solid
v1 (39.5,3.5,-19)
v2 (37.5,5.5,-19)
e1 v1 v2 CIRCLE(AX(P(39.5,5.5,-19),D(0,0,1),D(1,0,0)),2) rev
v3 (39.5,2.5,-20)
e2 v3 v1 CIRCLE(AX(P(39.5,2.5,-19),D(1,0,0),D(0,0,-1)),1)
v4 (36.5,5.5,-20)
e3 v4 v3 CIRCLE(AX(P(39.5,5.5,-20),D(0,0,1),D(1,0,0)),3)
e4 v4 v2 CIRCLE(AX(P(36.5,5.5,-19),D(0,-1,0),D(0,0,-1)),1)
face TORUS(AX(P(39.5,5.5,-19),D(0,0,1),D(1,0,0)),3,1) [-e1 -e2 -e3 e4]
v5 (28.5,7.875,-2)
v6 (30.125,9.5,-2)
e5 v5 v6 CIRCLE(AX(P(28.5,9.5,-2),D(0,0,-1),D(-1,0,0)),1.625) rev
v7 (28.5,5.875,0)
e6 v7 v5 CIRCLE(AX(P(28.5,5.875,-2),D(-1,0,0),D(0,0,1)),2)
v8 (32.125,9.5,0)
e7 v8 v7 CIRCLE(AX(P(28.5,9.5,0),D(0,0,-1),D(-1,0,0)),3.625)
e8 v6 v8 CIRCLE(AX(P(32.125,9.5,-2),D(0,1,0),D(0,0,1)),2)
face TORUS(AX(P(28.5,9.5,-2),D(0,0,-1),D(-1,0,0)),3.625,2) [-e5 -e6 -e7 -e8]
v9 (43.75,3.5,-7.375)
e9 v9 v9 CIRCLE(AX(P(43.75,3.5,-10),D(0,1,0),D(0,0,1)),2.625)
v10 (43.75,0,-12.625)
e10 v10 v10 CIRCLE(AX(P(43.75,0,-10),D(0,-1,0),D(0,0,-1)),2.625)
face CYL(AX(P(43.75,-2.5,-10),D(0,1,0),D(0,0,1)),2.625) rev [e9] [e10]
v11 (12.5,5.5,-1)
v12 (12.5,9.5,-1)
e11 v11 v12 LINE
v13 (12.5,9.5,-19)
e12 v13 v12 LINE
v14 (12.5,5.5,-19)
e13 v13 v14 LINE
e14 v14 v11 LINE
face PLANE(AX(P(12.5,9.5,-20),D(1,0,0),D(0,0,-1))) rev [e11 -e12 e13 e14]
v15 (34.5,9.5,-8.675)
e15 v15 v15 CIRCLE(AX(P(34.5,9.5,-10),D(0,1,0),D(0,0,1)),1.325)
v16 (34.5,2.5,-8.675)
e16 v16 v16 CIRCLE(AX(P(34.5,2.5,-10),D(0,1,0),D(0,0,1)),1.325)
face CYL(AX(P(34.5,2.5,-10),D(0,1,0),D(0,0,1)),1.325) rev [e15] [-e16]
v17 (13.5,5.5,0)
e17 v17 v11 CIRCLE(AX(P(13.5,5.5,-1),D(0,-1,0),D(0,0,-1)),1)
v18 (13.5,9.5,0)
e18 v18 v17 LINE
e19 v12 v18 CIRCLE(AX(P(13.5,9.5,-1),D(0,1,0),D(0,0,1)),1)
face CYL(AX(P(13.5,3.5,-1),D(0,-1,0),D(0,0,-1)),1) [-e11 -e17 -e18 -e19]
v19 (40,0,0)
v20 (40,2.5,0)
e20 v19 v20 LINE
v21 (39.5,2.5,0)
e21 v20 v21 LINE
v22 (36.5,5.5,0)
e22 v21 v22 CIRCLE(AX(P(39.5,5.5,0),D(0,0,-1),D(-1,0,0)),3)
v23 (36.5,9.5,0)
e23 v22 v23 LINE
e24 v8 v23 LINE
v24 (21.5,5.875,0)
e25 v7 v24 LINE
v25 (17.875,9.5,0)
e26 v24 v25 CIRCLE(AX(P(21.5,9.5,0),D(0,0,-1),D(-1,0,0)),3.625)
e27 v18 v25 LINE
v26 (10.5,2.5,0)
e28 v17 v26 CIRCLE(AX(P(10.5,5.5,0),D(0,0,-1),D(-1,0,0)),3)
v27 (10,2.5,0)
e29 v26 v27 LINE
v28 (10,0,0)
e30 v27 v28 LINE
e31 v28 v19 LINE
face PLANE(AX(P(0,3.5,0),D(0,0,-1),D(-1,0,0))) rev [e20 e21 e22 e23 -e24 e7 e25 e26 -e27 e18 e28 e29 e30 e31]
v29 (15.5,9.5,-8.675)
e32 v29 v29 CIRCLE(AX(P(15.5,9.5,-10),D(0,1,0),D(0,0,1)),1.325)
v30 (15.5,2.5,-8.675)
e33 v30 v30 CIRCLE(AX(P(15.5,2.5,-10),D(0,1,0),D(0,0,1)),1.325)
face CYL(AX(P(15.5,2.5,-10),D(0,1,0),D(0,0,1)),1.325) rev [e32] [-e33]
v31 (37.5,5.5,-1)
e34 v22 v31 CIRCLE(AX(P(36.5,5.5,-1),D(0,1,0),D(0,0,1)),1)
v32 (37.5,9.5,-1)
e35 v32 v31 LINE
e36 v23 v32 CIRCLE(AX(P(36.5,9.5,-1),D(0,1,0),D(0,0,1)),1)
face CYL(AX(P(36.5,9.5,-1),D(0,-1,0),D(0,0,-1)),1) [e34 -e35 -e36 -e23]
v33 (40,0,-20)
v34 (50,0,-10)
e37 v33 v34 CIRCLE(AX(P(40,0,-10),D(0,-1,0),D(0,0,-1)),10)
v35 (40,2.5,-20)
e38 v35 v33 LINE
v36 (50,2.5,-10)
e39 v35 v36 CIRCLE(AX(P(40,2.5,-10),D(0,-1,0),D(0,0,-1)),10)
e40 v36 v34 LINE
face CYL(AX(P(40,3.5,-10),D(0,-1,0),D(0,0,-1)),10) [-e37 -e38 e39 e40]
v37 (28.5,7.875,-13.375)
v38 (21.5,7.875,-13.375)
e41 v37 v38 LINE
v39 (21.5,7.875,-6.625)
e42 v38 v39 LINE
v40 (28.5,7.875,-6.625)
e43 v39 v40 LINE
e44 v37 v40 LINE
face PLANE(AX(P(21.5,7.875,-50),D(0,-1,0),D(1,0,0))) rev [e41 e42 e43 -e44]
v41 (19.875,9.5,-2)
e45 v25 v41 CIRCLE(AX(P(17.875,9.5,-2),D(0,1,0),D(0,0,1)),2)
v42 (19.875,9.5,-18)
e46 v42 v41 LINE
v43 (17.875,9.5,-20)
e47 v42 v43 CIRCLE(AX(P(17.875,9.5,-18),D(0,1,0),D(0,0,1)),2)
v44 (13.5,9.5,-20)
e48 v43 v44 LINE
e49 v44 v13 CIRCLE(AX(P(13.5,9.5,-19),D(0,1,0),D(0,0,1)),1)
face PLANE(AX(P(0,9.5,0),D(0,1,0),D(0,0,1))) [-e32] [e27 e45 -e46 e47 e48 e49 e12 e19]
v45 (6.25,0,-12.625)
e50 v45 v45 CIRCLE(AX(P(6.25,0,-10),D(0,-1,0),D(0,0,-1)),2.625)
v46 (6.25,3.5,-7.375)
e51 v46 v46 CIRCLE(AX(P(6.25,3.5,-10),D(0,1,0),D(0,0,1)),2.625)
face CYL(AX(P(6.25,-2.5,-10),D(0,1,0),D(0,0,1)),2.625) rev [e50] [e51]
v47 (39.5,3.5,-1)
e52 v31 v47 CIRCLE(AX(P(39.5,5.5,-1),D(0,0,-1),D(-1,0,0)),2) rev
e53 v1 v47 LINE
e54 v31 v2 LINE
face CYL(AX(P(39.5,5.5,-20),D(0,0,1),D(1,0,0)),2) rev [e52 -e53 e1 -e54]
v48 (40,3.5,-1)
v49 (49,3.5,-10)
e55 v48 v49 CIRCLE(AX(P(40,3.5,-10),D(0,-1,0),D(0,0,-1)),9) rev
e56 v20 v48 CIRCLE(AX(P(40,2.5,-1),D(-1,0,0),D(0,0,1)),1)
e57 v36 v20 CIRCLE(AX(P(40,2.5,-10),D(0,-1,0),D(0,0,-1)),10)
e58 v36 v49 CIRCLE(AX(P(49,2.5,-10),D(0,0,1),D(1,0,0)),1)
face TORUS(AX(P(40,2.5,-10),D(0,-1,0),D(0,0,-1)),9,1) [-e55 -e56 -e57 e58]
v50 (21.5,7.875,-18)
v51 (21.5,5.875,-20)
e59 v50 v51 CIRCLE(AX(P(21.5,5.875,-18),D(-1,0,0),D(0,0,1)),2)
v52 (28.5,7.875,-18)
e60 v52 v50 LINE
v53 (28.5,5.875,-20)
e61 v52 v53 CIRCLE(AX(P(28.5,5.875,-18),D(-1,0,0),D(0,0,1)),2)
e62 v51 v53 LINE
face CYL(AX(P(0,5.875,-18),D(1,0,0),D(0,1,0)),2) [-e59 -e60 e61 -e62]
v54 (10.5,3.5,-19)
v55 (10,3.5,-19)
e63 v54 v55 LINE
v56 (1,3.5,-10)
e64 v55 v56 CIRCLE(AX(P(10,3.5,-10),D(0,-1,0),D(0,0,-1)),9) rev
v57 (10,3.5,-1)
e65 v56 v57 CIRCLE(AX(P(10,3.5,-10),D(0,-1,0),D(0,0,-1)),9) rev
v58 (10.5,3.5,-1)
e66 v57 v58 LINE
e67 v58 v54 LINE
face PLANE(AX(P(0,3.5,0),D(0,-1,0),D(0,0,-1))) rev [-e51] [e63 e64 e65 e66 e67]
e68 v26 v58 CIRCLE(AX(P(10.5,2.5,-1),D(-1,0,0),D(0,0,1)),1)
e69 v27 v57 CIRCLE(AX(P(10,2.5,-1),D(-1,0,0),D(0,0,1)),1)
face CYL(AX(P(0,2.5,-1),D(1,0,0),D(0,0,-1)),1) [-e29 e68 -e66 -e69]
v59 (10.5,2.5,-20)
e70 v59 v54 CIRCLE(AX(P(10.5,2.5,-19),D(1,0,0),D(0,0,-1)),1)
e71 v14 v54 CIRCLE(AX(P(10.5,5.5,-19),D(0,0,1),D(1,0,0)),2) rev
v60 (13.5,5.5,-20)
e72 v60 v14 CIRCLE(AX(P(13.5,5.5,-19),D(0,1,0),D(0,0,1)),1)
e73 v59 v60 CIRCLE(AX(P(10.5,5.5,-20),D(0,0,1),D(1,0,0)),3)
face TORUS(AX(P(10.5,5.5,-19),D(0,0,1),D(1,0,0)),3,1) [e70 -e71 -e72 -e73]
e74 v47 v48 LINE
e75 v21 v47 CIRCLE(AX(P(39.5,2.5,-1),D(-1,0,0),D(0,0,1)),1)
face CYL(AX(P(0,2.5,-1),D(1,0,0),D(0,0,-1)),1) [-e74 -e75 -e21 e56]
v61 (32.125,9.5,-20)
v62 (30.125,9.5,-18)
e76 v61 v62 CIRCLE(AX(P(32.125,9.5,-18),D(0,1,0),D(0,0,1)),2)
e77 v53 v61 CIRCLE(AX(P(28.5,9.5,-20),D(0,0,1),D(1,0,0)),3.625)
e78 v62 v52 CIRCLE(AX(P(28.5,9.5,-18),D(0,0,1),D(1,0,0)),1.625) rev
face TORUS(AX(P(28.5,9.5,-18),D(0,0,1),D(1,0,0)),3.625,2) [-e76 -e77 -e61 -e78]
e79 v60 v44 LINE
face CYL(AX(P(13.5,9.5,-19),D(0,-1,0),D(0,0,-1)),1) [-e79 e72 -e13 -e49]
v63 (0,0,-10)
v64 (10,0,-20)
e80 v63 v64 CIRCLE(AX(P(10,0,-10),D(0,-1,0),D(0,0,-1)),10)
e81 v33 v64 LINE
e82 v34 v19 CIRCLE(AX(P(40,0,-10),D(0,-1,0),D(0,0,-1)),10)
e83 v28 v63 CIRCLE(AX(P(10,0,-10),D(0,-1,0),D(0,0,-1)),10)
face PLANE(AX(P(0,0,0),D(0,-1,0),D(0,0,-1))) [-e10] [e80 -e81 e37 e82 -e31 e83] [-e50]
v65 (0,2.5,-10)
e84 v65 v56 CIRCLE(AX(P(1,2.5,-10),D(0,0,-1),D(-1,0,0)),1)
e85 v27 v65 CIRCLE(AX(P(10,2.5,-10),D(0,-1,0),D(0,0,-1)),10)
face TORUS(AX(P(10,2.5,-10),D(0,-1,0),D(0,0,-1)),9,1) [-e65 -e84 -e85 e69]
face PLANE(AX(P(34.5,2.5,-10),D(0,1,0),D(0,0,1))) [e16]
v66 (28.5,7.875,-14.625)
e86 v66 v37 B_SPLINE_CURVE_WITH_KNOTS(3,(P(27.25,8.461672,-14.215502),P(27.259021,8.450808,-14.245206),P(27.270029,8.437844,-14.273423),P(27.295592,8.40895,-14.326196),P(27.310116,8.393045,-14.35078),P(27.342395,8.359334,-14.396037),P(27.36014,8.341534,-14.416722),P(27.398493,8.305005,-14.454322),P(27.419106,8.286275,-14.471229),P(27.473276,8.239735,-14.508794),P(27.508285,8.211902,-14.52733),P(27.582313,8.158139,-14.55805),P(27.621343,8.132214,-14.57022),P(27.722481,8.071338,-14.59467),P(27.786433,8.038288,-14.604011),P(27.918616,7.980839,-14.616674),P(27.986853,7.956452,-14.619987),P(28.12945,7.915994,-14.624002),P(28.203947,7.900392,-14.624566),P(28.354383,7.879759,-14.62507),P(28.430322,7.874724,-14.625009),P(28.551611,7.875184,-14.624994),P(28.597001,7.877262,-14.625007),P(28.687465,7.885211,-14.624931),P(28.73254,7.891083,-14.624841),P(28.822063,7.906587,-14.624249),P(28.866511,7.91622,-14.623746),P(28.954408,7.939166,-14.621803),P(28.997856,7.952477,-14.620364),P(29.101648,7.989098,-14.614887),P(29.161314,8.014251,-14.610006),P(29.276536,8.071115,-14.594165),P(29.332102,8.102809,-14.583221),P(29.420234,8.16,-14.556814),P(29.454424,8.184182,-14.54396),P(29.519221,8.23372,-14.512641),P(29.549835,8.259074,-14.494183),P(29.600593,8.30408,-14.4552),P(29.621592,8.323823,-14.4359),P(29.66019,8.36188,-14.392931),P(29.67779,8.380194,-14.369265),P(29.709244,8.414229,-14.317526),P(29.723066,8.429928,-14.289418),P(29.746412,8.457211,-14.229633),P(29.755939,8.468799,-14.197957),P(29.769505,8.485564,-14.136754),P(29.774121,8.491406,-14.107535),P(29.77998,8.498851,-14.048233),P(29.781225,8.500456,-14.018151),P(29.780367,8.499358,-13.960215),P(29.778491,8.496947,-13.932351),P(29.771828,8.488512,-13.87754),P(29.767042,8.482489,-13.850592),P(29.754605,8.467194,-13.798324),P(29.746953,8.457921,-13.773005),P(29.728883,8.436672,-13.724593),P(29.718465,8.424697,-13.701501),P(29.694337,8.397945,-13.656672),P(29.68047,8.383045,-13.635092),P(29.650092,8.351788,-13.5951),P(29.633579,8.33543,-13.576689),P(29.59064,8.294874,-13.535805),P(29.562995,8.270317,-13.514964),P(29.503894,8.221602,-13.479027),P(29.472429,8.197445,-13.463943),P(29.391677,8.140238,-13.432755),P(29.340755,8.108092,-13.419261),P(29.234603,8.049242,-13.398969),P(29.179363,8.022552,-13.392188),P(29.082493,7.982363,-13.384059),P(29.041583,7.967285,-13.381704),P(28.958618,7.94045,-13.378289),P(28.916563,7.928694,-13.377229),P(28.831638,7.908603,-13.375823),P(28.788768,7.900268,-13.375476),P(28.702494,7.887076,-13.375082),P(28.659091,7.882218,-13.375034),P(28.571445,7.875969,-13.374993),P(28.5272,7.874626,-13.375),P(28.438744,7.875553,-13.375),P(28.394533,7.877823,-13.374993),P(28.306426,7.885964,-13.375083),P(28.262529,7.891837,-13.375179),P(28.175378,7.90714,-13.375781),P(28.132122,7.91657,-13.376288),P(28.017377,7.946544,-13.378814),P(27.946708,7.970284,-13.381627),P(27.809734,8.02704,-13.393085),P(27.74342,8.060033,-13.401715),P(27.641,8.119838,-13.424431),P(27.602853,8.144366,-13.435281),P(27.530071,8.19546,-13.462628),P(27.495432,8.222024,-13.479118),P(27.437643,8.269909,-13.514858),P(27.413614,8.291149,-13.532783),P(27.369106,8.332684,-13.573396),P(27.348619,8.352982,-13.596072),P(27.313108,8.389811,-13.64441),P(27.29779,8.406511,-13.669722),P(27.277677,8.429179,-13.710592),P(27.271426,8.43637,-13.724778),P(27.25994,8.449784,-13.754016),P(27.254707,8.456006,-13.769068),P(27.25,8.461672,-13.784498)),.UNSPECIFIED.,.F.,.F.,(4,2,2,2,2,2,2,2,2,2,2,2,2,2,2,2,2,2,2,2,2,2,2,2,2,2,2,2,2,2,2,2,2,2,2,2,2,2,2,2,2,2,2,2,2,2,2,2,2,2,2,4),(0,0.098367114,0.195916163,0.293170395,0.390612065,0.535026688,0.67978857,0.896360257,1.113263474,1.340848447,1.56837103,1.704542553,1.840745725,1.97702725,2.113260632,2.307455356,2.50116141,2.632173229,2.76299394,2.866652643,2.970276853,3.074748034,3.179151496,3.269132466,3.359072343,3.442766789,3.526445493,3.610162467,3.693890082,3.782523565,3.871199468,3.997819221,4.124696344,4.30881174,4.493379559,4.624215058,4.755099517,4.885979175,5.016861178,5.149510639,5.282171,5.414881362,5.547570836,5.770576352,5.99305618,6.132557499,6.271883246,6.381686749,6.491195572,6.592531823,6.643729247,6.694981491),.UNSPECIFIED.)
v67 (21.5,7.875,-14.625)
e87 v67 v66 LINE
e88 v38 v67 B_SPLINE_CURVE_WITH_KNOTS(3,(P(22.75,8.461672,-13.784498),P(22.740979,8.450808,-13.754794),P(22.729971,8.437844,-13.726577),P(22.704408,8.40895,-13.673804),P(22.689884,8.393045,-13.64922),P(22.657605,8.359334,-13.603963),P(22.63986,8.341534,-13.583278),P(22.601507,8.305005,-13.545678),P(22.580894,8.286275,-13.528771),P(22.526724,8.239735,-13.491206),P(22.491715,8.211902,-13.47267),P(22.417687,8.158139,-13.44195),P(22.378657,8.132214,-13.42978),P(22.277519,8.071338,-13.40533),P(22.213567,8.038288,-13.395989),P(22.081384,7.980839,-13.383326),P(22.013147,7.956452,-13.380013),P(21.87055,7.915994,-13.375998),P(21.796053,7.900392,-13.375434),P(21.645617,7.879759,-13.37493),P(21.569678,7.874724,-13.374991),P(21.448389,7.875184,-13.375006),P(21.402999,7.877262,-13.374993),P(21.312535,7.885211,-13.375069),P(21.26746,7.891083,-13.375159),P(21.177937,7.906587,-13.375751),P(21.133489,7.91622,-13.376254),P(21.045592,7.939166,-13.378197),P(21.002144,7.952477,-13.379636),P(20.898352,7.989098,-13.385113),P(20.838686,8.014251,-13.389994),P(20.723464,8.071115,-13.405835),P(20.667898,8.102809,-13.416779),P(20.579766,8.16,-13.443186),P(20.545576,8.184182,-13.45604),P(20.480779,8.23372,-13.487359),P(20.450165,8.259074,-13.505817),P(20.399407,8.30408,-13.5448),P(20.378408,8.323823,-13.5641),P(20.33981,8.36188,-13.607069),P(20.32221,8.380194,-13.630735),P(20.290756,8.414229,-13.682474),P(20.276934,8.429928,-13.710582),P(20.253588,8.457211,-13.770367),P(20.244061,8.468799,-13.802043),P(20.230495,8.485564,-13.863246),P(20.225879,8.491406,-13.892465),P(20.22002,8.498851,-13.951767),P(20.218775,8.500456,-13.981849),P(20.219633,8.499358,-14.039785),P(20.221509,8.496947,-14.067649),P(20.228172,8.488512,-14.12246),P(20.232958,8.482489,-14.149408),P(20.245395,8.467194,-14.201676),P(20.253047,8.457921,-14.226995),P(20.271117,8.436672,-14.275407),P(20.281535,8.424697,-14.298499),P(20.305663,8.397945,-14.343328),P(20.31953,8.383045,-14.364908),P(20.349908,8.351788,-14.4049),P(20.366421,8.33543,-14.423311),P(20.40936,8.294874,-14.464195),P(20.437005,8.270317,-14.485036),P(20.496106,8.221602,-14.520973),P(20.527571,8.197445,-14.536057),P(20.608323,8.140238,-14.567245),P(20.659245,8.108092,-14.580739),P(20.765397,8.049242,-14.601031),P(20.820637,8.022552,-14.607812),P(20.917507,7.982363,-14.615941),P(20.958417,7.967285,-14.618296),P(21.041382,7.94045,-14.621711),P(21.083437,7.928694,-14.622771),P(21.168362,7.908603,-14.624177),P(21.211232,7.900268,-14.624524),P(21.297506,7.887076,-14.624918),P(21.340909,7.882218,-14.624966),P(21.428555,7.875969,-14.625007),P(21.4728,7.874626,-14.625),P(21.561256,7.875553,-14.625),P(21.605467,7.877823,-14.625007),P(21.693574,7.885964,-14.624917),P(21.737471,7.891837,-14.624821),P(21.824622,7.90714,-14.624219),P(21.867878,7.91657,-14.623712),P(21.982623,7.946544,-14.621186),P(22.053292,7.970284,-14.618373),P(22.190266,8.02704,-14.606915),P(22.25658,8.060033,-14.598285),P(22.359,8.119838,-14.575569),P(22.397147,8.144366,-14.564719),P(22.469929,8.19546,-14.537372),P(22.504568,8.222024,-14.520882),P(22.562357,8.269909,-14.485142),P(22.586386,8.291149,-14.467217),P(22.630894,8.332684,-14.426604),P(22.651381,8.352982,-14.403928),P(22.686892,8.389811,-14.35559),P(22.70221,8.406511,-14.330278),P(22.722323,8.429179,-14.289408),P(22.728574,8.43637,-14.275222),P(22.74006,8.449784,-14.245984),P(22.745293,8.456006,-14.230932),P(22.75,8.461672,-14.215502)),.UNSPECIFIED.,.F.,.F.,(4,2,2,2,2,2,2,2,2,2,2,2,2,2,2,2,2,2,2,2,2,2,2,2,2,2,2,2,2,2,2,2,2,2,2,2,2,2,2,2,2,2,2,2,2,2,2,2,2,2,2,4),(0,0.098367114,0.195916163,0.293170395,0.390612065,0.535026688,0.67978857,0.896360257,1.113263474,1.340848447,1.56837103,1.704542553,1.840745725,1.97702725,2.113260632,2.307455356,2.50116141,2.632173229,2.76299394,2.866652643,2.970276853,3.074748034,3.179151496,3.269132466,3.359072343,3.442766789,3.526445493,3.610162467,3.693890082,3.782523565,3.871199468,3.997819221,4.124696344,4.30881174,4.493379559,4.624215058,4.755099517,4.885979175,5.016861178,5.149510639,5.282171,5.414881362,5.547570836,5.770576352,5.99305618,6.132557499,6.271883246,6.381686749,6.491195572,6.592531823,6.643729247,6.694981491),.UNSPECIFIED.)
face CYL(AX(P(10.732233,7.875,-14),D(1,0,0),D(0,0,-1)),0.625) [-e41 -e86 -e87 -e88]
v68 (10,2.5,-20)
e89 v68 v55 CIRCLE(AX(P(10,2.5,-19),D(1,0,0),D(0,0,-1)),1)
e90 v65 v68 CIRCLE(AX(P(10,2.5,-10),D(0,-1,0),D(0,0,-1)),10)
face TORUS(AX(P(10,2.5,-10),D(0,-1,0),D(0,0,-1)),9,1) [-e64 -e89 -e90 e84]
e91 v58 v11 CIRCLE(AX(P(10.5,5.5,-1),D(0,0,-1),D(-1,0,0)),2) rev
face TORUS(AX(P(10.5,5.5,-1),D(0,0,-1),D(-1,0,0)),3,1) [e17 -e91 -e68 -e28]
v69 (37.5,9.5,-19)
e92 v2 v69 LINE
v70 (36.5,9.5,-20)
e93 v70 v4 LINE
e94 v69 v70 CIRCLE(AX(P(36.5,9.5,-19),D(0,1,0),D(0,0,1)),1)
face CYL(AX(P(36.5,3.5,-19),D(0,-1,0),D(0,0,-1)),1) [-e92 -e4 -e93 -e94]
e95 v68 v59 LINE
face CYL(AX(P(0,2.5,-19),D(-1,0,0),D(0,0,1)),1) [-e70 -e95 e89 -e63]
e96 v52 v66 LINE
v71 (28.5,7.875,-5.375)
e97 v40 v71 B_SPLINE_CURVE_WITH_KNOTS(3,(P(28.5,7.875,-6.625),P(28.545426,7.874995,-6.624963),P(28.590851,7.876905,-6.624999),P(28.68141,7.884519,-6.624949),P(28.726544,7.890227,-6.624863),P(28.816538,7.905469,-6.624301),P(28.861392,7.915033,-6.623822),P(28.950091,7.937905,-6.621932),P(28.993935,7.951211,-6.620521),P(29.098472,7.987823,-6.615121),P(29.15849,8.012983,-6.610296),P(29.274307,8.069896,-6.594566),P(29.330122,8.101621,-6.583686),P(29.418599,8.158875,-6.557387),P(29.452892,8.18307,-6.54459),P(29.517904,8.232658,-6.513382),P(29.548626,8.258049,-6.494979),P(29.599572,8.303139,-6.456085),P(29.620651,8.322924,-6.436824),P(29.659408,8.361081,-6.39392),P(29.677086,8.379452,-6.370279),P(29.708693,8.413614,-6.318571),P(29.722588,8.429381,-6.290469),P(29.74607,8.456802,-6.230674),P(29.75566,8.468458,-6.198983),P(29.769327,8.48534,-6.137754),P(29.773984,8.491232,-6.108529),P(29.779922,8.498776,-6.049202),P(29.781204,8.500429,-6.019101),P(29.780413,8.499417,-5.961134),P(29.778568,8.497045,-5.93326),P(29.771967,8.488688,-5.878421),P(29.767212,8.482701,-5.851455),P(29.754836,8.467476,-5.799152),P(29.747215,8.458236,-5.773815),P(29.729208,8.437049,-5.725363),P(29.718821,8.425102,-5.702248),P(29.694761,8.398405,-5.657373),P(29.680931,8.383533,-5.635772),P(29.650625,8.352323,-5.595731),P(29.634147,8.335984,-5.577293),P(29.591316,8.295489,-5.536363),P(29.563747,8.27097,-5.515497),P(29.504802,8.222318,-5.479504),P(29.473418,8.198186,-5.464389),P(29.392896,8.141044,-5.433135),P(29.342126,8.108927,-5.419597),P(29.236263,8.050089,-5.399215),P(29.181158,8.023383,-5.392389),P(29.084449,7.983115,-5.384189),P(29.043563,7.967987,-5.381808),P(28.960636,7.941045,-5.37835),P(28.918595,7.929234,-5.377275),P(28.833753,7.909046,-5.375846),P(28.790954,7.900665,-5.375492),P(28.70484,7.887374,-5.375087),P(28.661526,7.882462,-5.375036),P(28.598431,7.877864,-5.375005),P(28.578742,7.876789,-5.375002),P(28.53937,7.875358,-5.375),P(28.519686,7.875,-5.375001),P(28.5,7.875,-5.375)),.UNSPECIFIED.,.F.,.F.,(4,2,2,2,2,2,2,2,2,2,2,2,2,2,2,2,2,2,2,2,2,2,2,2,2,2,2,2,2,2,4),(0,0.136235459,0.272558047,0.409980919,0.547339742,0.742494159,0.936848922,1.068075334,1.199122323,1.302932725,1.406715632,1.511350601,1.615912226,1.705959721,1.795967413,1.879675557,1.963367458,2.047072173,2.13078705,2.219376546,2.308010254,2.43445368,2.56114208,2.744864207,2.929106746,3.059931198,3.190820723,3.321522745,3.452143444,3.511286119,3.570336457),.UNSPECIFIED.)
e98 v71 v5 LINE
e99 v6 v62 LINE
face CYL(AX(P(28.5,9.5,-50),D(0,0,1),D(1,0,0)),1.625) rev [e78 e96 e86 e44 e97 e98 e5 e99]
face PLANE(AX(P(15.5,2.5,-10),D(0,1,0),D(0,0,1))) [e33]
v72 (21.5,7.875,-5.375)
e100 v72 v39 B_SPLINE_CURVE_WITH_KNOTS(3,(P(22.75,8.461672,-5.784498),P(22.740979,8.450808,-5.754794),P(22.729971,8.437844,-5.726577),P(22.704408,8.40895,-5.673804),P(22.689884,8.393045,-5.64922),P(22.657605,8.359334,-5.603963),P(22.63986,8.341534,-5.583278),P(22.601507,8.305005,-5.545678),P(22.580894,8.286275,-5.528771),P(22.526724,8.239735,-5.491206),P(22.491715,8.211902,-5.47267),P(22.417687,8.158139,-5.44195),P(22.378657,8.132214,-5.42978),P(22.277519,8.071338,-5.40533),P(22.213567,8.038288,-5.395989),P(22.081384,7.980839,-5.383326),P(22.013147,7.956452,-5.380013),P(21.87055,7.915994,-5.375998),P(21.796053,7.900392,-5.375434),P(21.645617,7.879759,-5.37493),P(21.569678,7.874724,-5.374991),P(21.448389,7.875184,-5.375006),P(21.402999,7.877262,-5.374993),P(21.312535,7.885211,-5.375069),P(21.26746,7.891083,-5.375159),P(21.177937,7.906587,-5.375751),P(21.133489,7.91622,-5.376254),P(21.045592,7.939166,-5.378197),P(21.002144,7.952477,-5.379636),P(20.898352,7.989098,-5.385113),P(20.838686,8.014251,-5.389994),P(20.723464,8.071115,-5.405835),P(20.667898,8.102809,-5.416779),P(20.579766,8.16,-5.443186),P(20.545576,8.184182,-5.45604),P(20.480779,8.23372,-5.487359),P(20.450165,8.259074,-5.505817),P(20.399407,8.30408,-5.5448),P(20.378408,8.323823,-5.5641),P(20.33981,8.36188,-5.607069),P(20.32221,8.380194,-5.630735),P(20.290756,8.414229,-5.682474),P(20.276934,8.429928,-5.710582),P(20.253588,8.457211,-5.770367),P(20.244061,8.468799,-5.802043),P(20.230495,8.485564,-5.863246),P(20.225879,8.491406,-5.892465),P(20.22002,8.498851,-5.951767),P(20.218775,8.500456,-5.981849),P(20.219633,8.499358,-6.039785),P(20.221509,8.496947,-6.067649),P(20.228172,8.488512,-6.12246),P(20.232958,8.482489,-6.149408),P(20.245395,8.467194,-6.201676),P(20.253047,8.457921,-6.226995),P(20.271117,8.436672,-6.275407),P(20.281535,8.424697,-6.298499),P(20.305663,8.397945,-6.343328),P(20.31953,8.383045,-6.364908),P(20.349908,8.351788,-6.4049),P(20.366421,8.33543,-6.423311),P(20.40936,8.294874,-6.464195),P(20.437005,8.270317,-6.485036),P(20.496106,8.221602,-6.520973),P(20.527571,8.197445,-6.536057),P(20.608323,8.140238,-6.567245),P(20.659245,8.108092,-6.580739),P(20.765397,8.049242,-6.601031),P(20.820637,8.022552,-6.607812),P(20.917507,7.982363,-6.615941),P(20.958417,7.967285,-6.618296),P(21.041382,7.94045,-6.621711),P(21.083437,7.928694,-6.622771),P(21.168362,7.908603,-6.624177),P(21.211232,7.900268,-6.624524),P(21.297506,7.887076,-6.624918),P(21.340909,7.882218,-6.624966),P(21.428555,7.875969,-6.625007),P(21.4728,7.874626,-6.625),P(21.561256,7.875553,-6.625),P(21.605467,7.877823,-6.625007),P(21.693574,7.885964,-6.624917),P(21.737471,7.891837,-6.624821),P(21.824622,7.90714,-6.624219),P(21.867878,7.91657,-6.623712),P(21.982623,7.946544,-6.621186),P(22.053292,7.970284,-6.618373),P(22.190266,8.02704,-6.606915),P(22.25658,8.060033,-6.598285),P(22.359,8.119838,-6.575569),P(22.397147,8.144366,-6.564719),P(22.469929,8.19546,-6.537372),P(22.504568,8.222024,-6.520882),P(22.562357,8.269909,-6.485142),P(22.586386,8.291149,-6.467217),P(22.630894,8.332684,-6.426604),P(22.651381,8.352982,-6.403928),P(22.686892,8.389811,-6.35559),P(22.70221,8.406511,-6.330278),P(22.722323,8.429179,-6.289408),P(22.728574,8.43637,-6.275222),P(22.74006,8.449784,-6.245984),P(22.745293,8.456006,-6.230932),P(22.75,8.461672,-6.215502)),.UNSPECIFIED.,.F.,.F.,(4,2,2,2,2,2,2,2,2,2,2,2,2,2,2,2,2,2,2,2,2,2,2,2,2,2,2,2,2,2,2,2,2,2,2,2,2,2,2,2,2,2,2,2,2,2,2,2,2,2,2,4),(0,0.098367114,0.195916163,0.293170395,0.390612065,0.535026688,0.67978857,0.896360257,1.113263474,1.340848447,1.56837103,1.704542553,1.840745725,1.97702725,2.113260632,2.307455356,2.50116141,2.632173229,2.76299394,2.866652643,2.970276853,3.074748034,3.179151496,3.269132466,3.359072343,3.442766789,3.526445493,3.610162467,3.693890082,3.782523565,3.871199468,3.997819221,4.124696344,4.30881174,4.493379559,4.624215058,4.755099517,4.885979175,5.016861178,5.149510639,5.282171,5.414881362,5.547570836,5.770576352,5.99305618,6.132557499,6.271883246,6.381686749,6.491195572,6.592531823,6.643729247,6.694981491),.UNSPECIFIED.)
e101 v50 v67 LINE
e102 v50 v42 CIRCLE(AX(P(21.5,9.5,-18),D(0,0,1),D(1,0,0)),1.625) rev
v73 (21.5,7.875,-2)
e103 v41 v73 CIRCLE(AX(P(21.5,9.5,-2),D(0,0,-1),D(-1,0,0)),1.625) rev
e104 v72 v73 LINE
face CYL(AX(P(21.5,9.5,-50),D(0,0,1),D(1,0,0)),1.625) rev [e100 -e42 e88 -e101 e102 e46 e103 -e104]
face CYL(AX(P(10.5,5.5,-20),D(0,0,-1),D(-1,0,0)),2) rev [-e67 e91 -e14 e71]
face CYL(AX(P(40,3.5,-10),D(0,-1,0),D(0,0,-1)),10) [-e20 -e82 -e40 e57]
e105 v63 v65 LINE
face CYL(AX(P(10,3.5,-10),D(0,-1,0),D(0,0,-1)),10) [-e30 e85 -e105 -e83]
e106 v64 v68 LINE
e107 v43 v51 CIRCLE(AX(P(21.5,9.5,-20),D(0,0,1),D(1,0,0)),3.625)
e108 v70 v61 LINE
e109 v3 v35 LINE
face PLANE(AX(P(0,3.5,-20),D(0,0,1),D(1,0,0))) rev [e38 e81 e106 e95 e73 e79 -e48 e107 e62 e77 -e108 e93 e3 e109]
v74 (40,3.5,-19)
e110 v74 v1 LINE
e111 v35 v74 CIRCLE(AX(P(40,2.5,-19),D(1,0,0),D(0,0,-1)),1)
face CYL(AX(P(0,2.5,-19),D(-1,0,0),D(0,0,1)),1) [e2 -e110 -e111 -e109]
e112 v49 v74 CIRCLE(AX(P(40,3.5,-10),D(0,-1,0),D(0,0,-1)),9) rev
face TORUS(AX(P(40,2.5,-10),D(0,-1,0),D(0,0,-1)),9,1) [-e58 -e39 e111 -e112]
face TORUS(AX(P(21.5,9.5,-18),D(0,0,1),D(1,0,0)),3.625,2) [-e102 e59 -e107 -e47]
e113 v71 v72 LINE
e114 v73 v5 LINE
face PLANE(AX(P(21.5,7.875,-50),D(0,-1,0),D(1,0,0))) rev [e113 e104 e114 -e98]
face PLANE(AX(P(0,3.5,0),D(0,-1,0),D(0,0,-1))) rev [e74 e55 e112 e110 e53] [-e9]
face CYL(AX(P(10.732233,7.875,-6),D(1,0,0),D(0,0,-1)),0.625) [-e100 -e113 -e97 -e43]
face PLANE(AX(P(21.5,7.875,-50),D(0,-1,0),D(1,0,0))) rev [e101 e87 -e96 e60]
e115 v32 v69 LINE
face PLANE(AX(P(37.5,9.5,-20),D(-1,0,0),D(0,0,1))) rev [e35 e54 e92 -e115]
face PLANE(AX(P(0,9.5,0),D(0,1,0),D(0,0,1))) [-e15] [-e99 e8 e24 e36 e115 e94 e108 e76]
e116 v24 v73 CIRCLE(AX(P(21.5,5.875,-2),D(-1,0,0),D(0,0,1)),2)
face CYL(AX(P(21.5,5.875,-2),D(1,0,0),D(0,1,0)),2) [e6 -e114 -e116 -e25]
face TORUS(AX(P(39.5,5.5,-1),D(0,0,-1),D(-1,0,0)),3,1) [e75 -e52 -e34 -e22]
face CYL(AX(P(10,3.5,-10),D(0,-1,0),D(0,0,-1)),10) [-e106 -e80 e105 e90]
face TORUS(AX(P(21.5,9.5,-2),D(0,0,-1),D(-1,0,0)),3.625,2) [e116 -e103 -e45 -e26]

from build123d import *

# Parameters (mm, degrees)
SKETCH1_W           = 50
SKETCH1_H           = 20
BOSS_EXTRUDE1_DEPTH = 3.5
SKETCH2_W           = 25
SKETCH2_H           = 20
BOSS_EXTRUDE2_DEPTH = 6
SKETCH3_R           = 2.625
CUT_EXTRUDE1_DEPTH  = 6
CUT_EXTRUDE2_DEPTH  = 50
SKETCH5_R           = 1.325
CUT_EXTRUDE3_DEPTH  = 7
FILLET1_R           = 10
FILLET2_R           = 2
SKETCH6_R           = 0.625
BOSS_EXTRUDE3_DEPTH = 25
FILLET3_R           = 2
FILLET4_R           = 1


with BuildPart() as part:
    # Sketch1 → Boss-Extrude1 (new body)
    with BuildSketch(Plane(origin=(0, 0, 0), x_dir=(1, 0, 0), z_dir=(0, 1, 0))):
        with Locations((25, 10)):
            Rectangle(SKETCH1_W, SKETCH1_H)
    extrude(amount=BOSS_EXTRUDE1_DEPTH)

    # Sketch2 → Boss-Extrude2 (add)
    with BuildSketch(Plane(origin=(0, 3.5, 0), x_dir=(1, 0, 0), z_dir=(0, 1, 0))):
        with Locations((25, 10)):
            Rectangle(SKETCH2_W, SKETCH2_H)
    extrude(amount=BOSS_EXTRUDE2_DEPTH)

    # Sketch3 → Cut-Extrude1 (cut)
    with BuildSketch(Plane(origin=(0, 3.5, 0), x_dir=(1, 0, 0), z_dir=(0, 1, 0))):
        with Locations(Location((6.25, 10, 0), (0, 0, 270))):
            Circle(SKETCH3_R)
        with Locations(Location((43.75, 10, 0), (0, 0, 270))):
            Circle(SKETCH3_R)
    extrude(amount=-CUT_EXTRUDE1_DEPTH, mode=Mode.SUBTRACT)

    # Sketch4 → Cut-Extrude2 (cut)
    with BuildSketch(Plane.XY):
        with BuildLine():
            Line((21.5, 11.125), (28.5, 11.125))
            ThreePointArc((28.5, 11.125), (30.125, 9.5), (28.5, 7.875))
            Line((28.5, 7.875), (21.5, 7.875))
            ThreePointArc((21.5, 7.875), (19.875, 9.5), (21.5, 11.125))
        make_face()
    extrude(amount=-CUT_EXTRUDE2_DEPTH, mode=Mode.SUBTRACT)

    # Sketch5 → Cut-Extrude3 (cut)
    with BuildSketch(Plane(origin=(0, 9.5, 0), x_dir=(1, 0, 0), z_dir=(0, 1, 0))):
        with Locations(Location((15.5, 10, 0), (0, 0, 270))):
            Circle(SKETCH5_R)
        with Locations(Location((34.5, 10, 0), (0, 0, 270))):
            Circle(SKETCH5_R)
    extrude(amount=-CUT_EXTRUDE3_DEPTH, mode=Mode.SUBTRACT)

    # Fillet1
    fillet1_edges = [part.edges().sort_by_distance(p)[0] for p in [
        (0, 1.75, -20),
        (0, 1.75, 0),
        (50, 1.75, -20),
        (50, 1.75, 0),
    ]]
    fillet(fillet1_edges, radius=FILLET1_R - 0.0001)  # a hair under: the kernel refuses the full size

    # Fillet2
    fillet2_edges = [part.edges().sort_by_distance(p)[0] for p in [
        (12.5, 3.5, -10),
        (37.5, 3.5, -10),
    ]]
    fillet(fillet2_edges, radius=FILLET2_R)

    # Sketch6 → Boss-Extrude3 (add)
    with BuildSketch(Plane(origin=(37.5, 0, 0), x_dir=(0, 0, -1), z_dir=(1, 0, 0))):
        with Locations((6, 7.875)):
            Circle(SKETCH6_R)
        with Locations((14, 7.875)):
            Circle(SKETCH6_R)
    extrude(amount=-BOSS_EXTRUDE3_DEPTH)

    # Fillet3
    fillet3_edges = [part.edges().sort_by_distance(p)[0] for p in [
        (25, 7.875, -20),
        (20.350951481, 8.350951481, -20),
        (29.649048519, 8.350951481, -20),
        (20.350951481, 8.350951481, 0),
        (25, 7.875, 0),
        (29.649048519, 8.350951481, 0),
    ]]
    fillet(fillet3_edges, radius=FILLET3_R)

    # Fillet4
    fillet4_edges = [part.edges().sort_by_distance(p)[0] for p in [
        (12.5, 7.5, -20),
        (12.5, 7.5, 0),
        (37.5, 7.5, 0),
        (37.5, 7.5, -20),
        (39.75005, 3.5, -20),
        (10.24995, 3.5, 0),
        (2.928902899, 3.5, -2.928902899),
        (2.928902899, 3.5, -17.071097101),
        (47.071097101, 3.5, -2.928902899),
        (47.071097101, 3.5, -17.071097101),
        (39.75005, 3.5, 0),
        (10.24995, 3.5, -20),
        (38.085786438, 4.085786438, -20),
        (38.085786438, 4.085786438, 0),
        (11.914213562, 4.085786438, 0),
        (11.914213562, 4.085786438, -20),
    ]]
    fillet(fillet4_edges, radius=FILLET4_R)


solid = part.part
